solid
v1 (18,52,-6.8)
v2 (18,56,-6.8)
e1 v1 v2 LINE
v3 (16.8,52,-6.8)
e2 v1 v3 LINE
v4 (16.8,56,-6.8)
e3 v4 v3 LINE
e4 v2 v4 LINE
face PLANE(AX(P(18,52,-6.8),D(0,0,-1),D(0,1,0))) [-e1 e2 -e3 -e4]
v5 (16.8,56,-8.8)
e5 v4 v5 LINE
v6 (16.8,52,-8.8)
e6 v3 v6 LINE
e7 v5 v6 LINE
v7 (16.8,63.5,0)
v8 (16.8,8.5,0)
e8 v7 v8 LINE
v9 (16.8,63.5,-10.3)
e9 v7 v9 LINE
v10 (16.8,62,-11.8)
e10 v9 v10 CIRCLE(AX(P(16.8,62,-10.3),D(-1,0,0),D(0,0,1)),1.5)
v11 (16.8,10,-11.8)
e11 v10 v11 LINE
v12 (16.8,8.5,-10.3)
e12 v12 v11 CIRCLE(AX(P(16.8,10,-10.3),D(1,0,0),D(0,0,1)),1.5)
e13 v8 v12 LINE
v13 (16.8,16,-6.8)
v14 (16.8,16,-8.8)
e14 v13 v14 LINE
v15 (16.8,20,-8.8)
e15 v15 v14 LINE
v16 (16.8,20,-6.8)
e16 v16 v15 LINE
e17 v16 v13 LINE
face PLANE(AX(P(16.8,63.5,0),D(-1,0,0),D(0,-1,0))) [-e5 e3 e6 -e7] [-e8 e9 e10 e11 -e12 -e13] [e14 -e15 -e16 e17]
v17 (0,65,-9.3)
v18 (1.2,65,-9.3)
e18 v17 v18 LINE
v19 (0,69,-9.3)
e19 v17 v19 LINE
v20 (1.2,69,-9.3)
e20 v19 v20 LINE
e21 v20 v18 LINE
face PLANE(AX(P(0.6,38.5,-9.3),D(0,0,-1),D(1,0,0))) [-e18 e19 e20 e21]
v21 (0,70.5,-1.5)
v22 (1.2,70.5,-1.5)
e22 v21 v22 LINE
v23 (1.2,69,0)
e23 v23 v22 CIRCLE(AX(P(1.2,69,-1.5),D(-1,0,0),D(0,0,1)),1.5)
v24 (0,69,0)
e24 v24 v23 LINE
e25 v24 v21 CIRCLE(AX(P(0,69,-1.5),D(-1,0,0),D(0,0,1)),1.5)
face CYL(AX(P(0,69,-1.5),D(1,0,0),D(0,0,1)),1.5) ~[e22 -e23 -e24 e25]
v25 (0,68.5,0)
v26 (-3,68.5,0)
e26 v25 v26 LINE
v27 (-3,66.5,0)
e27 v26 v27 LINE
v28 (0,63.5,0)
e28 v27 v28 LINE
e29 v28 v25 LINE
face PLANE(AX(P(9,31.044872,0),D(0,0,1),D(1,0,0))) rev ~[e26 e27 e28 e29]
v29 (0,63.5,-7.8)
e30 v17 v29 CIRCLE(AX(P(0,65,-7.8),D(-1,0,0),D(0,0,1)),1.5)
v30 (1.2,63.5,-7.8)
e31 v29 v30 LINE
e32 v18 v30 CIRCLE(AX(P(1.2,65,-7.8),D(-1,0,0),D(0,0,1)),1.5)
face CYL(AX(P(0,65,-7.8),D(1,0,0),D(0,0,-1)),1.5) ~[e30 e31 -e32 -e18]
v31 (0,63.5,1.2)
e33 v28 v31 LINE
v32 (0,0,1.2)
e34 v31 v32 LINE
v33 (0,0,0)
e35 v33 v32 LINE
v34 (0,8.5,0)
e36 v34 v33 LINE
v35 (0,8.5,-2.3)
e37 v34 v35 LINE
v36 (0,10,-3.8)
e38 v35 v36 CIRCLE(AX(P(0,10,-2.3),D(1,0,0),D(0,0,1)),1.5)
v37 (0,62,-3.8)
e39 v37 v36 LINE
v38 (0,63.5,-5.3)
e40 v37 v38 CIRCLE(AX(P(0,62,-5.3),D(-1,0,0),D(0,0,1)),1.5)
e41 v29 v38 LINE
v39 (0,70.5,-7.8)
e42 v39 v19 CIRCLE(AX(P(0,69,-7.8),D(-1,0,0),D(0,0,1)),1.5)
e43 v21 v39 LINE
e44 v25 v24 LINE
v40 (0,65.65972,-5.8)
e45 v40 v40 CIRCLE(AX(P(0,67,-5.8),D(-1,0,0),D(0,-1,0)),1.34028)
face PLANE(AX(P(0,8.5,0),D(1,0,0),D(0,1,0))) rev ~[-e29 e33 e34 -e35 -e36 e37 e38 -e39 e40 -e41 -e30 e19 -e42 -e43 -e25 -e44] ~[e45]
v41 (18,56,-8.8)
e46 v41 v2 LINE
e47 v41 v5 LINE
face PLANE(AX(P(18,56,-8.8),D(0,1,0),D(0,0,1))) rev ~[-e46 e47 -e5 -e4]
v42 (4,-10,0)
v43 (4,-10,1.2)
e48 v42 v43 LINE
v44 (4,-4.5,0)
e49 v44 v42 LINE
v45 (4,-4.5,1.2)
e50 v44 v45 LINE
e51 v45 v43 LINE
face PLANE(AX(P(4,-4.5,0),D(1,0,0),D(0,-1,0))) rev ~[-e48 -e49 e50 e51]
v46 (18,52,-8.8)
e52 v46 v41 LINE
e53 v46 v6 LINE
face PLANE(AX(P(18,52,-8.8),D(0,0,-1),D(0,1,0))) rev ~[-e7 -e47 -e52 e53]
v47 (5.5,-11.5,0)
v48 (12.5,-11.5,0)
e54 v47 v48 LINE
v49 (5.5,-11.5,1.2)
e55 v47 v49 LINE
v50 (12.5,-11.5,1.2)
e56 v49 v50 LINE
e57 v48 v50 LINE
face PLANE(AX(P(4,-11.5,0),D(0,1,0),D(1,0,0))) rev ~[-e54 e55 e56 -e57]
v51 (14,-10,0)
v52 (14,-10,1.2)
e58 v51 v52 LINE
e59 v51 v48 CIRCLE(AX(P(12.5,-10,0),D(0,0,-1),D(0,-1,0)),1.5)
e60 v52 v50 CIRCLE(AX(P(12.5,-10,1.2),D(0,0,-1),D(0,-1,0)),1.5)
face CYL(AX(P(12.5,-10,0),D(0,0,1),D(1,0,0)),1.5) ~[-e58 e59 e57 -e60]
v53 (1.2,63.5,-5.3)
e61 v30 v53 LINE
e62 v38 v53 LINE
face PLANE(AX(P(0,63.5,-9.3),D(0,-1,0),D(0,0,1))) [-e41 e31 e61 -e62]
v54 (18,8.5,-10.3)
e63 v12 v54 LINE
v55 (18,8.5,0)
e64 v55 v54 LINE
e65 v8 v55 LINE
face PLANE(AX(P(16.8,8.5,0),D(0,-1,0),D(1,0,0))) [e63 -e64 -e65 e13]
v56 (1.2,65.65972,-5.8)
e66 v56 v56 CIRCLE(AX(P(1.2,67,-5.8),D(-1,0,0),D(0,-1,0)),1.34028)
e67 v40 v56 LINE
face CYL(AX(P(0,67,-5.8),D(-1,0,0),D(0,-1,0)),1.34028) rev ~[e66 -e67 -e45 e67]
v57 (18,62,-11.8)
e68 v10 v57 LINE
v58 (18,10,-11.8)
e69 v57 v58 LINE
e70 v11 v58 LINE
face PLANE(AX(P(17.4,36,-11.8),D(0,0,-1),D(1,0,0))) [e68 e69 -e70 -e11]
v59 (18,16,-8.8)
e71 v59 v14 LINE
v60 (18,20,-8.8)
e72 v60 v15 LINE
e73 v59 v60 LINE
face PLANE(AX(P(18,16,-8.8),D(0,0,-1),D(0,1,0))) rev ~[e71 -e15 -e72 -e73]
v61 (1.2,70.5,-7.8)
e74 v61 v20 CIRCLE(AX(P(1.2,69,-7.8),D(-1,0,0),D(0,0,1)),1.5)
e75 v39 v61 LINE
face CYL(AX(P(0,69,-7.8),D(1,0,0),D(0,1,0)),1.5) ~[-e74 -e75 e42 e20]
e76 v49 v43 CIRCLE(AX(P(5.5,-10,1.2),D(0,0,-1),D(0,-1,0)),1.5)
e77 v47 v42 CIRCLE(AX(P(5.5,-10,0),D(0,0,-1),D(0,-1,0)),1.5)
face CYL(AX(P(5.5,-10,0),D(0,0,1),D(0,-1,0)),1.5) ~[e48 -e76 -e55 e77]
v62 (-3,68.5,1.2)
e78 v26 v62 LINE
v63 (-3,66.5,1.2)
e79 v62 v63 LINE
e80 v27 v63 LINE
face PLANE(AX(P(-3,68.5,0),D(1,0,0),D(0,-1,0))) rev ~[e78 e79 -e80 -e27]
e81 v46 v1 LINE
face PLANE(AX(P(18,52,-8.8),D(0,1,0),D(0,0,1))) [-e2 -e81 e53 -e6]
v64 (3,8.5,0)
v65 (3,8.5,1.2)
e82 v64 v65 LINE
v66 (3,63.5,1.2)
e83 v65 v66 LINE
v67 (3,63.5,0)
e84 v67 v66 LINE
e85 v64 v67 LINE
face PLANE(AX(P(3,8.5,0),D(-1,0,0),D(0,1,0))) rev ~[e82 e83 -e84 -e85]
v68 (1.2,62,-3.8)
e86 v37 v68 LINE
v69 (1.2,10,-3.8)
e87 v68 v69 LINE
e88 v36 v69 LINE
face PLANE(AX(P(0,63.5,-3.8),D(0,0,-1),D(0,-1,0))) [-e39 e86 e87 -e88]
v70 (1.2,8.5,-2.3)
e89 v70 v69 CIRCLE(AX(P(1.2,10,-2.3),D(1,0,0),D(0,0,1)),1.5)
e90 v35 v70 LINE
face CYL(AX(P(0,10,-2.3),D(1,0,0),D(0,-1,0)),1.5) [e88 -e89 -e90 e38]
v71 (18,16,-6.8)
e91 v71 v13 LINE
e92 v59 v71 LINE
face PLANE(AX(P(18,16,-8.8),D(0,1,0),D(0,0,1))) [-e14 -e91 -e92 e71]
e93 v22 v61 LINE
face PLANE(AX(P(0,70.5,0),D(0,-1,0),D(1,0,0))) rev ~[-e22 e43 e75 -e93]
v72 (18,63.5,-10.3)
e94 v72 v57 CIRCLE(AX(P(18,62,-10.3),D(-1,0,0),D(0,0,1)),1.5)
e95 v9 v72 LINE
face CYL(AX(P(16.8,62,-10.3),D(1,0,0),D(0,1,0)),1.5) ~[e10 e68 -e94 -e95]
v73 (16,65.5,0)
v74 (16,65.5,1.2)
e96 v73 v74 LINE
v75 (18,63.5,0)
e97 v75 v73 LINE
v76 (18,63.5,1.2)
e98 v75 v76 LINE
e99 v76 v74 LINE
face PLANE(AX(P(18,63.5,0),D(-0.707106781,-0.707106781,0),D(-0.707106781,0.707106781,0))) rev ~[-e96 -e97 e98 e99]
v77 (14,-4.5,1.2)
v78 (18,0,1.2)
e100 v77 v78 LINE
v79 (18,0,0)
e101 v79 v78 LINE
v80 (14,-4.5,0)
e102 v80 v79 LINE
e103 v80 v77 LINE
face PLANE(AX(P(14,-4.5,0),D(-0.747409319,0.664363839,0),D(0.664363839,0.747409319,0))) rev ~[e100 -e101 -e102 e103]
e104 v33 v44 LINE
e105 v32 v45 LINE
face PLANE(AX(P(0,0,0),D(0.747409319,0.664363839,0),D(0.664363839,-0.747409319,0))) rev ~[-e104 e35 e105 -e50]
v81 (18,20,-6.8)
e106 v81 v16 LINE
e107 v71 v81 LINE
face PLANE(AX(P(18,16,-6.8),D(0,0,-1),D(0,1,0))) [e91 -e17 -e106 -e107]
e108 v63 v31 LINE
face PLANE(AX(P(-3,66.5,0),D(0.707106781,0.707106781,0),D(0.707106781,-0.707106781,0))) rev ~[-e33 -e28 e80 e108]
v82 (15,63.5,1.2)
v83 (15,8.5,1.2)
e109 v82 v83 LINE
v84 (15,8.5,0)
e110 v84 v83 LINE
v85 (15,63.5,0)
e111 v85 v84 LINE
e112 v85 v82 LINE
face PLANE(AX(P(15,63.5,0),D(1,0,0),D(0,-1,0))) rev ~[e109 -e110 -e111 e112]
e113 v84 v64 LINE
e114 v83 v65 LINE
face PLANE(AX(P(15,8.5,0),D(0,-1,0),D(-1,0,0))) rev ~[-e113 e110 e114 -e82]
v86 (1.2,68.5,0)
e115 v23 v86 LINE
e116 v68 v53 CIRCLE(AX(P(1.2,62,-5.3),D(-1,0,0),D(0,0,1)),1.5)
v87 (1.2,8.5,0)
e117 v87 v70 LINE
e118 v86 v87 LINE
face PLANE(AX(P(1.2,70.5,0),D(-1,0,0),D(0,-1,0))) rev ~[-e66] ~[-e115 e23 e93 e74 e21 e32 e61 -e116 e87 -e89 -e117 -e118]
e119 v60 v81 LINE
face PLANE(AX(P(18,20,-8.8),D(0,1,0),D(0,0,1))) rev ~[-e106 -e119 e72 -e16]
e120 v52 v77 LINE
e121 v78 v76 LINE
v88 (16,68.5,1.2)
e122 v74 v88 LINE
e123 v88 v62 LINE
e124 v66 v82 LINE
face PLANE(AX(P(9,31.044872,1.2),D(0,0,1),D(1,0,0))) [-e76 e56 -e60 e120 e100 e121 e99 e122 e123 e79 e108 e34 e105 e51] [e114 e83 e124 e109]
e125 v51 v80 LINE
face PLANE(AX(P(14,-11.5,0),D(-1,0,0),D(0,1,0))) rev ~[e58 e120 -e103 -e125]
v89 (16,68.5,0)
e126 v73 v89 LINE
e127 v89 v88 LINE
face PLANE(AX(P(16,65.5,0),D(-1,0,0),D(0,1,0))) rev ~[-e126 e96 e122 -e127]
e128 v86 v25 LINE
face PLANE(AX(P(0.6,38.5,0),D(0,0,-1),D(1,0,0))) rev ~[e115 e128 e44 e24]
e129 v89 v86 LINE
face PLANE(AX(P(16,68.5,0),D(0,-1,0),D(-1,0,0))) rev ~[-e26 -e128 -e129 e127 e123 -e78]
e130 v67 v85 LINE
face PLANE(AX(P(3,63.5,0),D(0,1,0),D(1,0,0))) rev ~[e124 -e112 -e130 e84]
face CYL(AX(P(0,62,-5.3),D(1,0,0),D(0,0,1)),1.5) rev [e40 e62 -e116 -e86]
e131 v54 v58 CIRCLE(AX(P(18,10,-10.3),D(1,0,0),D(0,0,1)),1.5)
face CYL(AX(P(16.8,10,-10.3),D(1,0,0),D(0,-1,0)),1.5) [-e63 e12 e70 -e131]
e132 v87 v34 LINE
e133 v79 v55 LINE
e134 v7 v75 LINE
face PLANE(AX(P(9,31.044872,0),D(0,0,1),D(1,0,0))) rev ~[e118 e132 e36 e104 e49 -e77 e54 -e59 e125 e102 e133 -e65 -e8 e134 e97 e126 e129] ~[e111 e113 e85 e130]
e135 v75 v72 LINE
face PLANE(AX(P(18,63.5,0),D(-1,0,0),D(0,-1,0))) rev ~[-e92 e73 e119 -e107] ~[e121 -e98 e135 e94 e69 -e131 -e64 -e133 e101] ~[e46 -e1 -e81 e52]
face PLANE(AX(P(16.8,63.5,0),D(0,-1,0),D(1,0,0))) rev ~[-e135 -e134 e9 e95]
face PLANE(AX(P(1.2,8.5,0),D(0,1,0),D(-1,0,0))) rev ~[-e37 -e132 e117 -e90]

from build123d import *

# Parameters (mm, degrees)
F1_DEPTH = 1.2
F2_W     = 1.2
F2_H     = 55
F3_DEPTH = 11.8
F4_W     = 4
F4_H     = 2
F5_DEPTH = 25
F2_H_2   = 2
F6_DEPTH = 9.3
F7_W     = 55
F7_H     = 5.5
F7_R     = 1.3402800484
F8_DEPTH = 5
F11_R    = 1.5


with BuildPart() as f1:
    # F0 (on Top) → F1 (new body)
    with BuildSketch(Plane.XY):
        Polygon((0, 63.5), (0, 0), (18, 0), (18, 63.5), (15, 63.5), (15, 8.5), (3, 8.5), (3, 63.5), align=None)
        Polygon((18, 0), (0, 0), (4, -4.5), (4, -11.5), (14, -11.5), (14, -4.5), align=None)
        Polygon((-3, 66.5), (0, 63.5), (3, 63.5), (15, 63.5), (18, 63.5), (16, 65.5), (16, 68.5), (-3, 68.5), align=None)
    extrude(amount=F1_DEPTH)

    # F2 (on face) → F3 (join)
    with BuildSketch(Plane(origin=(0, 0, 0), x_dir=(1, 0, 0), z_dir=(0, 0, -1))):
        with Locations((17.4, -36)):
            Rectangle(F2_W, F2_H)
    extrude(amount=F3_DEPTH)

    # F4 (on face) → F5 (cut)
    with BuildSketch(Plane.YZ.offset(18)):
        with Locations((18, -7.8)):
            Rectangle(F4_W, F4_H)
        with Locations((54, -7.8)):
            Rectangle(F4_W, F4_H)
    extrude(amount=-F5_DEPTH, mode=Mode.SUBTRACT)

    # F2 (on face) → F6 (join)
    with BuildSketch(Plane(origin=(0, 0, 0), x_dir=(1, 0, 0), z_dir=(0, 0, -1))):
        Polygon((0, -68.5), (1.2, -68.5), (1.2, -8.5), (0, -8.5), (0, -63.5), align=None)
        with Locations((0.6, -69.5)):
            Rectangle(F2_W, F2_H_2)
    extrude(amount=F6_DEPTH)

    # F7 (on face) → F8 (cut)
    with BuildSketch(Plane(origin=(0, 0, 0), x_dir=(0, -1, 0), z_dir=(-1, 0, 0))):
        with Locations((-36, -6.55)):
            Rectangle(F7_W, F7_H)
        with Locations((-67, -5.8)):
            Circle(F7_R)
    extrude(amount=-F8_DEPTH, mode=Mode.SUBTRACT)

    # F11
    f11_edges = [f1.edges().sort_by_distance(p)[0] for p in [
        (0.6, 70.5, -9.3),
        (0.6, 63.5, -9.3),
        (0.6, 8.5, -3.8),
        (17.4, 8.5, -11.8),
        (17.4, 63.5, -11.8),
        (4, -11.5, 0.6),
        (14, -11.5, 0.6),
        (0.6, 70.5, 0),
        (0.6, 63.5, -3.8),
    ]]
    fillet(f11_edges, radius=F11_R)


solid = f1.part
